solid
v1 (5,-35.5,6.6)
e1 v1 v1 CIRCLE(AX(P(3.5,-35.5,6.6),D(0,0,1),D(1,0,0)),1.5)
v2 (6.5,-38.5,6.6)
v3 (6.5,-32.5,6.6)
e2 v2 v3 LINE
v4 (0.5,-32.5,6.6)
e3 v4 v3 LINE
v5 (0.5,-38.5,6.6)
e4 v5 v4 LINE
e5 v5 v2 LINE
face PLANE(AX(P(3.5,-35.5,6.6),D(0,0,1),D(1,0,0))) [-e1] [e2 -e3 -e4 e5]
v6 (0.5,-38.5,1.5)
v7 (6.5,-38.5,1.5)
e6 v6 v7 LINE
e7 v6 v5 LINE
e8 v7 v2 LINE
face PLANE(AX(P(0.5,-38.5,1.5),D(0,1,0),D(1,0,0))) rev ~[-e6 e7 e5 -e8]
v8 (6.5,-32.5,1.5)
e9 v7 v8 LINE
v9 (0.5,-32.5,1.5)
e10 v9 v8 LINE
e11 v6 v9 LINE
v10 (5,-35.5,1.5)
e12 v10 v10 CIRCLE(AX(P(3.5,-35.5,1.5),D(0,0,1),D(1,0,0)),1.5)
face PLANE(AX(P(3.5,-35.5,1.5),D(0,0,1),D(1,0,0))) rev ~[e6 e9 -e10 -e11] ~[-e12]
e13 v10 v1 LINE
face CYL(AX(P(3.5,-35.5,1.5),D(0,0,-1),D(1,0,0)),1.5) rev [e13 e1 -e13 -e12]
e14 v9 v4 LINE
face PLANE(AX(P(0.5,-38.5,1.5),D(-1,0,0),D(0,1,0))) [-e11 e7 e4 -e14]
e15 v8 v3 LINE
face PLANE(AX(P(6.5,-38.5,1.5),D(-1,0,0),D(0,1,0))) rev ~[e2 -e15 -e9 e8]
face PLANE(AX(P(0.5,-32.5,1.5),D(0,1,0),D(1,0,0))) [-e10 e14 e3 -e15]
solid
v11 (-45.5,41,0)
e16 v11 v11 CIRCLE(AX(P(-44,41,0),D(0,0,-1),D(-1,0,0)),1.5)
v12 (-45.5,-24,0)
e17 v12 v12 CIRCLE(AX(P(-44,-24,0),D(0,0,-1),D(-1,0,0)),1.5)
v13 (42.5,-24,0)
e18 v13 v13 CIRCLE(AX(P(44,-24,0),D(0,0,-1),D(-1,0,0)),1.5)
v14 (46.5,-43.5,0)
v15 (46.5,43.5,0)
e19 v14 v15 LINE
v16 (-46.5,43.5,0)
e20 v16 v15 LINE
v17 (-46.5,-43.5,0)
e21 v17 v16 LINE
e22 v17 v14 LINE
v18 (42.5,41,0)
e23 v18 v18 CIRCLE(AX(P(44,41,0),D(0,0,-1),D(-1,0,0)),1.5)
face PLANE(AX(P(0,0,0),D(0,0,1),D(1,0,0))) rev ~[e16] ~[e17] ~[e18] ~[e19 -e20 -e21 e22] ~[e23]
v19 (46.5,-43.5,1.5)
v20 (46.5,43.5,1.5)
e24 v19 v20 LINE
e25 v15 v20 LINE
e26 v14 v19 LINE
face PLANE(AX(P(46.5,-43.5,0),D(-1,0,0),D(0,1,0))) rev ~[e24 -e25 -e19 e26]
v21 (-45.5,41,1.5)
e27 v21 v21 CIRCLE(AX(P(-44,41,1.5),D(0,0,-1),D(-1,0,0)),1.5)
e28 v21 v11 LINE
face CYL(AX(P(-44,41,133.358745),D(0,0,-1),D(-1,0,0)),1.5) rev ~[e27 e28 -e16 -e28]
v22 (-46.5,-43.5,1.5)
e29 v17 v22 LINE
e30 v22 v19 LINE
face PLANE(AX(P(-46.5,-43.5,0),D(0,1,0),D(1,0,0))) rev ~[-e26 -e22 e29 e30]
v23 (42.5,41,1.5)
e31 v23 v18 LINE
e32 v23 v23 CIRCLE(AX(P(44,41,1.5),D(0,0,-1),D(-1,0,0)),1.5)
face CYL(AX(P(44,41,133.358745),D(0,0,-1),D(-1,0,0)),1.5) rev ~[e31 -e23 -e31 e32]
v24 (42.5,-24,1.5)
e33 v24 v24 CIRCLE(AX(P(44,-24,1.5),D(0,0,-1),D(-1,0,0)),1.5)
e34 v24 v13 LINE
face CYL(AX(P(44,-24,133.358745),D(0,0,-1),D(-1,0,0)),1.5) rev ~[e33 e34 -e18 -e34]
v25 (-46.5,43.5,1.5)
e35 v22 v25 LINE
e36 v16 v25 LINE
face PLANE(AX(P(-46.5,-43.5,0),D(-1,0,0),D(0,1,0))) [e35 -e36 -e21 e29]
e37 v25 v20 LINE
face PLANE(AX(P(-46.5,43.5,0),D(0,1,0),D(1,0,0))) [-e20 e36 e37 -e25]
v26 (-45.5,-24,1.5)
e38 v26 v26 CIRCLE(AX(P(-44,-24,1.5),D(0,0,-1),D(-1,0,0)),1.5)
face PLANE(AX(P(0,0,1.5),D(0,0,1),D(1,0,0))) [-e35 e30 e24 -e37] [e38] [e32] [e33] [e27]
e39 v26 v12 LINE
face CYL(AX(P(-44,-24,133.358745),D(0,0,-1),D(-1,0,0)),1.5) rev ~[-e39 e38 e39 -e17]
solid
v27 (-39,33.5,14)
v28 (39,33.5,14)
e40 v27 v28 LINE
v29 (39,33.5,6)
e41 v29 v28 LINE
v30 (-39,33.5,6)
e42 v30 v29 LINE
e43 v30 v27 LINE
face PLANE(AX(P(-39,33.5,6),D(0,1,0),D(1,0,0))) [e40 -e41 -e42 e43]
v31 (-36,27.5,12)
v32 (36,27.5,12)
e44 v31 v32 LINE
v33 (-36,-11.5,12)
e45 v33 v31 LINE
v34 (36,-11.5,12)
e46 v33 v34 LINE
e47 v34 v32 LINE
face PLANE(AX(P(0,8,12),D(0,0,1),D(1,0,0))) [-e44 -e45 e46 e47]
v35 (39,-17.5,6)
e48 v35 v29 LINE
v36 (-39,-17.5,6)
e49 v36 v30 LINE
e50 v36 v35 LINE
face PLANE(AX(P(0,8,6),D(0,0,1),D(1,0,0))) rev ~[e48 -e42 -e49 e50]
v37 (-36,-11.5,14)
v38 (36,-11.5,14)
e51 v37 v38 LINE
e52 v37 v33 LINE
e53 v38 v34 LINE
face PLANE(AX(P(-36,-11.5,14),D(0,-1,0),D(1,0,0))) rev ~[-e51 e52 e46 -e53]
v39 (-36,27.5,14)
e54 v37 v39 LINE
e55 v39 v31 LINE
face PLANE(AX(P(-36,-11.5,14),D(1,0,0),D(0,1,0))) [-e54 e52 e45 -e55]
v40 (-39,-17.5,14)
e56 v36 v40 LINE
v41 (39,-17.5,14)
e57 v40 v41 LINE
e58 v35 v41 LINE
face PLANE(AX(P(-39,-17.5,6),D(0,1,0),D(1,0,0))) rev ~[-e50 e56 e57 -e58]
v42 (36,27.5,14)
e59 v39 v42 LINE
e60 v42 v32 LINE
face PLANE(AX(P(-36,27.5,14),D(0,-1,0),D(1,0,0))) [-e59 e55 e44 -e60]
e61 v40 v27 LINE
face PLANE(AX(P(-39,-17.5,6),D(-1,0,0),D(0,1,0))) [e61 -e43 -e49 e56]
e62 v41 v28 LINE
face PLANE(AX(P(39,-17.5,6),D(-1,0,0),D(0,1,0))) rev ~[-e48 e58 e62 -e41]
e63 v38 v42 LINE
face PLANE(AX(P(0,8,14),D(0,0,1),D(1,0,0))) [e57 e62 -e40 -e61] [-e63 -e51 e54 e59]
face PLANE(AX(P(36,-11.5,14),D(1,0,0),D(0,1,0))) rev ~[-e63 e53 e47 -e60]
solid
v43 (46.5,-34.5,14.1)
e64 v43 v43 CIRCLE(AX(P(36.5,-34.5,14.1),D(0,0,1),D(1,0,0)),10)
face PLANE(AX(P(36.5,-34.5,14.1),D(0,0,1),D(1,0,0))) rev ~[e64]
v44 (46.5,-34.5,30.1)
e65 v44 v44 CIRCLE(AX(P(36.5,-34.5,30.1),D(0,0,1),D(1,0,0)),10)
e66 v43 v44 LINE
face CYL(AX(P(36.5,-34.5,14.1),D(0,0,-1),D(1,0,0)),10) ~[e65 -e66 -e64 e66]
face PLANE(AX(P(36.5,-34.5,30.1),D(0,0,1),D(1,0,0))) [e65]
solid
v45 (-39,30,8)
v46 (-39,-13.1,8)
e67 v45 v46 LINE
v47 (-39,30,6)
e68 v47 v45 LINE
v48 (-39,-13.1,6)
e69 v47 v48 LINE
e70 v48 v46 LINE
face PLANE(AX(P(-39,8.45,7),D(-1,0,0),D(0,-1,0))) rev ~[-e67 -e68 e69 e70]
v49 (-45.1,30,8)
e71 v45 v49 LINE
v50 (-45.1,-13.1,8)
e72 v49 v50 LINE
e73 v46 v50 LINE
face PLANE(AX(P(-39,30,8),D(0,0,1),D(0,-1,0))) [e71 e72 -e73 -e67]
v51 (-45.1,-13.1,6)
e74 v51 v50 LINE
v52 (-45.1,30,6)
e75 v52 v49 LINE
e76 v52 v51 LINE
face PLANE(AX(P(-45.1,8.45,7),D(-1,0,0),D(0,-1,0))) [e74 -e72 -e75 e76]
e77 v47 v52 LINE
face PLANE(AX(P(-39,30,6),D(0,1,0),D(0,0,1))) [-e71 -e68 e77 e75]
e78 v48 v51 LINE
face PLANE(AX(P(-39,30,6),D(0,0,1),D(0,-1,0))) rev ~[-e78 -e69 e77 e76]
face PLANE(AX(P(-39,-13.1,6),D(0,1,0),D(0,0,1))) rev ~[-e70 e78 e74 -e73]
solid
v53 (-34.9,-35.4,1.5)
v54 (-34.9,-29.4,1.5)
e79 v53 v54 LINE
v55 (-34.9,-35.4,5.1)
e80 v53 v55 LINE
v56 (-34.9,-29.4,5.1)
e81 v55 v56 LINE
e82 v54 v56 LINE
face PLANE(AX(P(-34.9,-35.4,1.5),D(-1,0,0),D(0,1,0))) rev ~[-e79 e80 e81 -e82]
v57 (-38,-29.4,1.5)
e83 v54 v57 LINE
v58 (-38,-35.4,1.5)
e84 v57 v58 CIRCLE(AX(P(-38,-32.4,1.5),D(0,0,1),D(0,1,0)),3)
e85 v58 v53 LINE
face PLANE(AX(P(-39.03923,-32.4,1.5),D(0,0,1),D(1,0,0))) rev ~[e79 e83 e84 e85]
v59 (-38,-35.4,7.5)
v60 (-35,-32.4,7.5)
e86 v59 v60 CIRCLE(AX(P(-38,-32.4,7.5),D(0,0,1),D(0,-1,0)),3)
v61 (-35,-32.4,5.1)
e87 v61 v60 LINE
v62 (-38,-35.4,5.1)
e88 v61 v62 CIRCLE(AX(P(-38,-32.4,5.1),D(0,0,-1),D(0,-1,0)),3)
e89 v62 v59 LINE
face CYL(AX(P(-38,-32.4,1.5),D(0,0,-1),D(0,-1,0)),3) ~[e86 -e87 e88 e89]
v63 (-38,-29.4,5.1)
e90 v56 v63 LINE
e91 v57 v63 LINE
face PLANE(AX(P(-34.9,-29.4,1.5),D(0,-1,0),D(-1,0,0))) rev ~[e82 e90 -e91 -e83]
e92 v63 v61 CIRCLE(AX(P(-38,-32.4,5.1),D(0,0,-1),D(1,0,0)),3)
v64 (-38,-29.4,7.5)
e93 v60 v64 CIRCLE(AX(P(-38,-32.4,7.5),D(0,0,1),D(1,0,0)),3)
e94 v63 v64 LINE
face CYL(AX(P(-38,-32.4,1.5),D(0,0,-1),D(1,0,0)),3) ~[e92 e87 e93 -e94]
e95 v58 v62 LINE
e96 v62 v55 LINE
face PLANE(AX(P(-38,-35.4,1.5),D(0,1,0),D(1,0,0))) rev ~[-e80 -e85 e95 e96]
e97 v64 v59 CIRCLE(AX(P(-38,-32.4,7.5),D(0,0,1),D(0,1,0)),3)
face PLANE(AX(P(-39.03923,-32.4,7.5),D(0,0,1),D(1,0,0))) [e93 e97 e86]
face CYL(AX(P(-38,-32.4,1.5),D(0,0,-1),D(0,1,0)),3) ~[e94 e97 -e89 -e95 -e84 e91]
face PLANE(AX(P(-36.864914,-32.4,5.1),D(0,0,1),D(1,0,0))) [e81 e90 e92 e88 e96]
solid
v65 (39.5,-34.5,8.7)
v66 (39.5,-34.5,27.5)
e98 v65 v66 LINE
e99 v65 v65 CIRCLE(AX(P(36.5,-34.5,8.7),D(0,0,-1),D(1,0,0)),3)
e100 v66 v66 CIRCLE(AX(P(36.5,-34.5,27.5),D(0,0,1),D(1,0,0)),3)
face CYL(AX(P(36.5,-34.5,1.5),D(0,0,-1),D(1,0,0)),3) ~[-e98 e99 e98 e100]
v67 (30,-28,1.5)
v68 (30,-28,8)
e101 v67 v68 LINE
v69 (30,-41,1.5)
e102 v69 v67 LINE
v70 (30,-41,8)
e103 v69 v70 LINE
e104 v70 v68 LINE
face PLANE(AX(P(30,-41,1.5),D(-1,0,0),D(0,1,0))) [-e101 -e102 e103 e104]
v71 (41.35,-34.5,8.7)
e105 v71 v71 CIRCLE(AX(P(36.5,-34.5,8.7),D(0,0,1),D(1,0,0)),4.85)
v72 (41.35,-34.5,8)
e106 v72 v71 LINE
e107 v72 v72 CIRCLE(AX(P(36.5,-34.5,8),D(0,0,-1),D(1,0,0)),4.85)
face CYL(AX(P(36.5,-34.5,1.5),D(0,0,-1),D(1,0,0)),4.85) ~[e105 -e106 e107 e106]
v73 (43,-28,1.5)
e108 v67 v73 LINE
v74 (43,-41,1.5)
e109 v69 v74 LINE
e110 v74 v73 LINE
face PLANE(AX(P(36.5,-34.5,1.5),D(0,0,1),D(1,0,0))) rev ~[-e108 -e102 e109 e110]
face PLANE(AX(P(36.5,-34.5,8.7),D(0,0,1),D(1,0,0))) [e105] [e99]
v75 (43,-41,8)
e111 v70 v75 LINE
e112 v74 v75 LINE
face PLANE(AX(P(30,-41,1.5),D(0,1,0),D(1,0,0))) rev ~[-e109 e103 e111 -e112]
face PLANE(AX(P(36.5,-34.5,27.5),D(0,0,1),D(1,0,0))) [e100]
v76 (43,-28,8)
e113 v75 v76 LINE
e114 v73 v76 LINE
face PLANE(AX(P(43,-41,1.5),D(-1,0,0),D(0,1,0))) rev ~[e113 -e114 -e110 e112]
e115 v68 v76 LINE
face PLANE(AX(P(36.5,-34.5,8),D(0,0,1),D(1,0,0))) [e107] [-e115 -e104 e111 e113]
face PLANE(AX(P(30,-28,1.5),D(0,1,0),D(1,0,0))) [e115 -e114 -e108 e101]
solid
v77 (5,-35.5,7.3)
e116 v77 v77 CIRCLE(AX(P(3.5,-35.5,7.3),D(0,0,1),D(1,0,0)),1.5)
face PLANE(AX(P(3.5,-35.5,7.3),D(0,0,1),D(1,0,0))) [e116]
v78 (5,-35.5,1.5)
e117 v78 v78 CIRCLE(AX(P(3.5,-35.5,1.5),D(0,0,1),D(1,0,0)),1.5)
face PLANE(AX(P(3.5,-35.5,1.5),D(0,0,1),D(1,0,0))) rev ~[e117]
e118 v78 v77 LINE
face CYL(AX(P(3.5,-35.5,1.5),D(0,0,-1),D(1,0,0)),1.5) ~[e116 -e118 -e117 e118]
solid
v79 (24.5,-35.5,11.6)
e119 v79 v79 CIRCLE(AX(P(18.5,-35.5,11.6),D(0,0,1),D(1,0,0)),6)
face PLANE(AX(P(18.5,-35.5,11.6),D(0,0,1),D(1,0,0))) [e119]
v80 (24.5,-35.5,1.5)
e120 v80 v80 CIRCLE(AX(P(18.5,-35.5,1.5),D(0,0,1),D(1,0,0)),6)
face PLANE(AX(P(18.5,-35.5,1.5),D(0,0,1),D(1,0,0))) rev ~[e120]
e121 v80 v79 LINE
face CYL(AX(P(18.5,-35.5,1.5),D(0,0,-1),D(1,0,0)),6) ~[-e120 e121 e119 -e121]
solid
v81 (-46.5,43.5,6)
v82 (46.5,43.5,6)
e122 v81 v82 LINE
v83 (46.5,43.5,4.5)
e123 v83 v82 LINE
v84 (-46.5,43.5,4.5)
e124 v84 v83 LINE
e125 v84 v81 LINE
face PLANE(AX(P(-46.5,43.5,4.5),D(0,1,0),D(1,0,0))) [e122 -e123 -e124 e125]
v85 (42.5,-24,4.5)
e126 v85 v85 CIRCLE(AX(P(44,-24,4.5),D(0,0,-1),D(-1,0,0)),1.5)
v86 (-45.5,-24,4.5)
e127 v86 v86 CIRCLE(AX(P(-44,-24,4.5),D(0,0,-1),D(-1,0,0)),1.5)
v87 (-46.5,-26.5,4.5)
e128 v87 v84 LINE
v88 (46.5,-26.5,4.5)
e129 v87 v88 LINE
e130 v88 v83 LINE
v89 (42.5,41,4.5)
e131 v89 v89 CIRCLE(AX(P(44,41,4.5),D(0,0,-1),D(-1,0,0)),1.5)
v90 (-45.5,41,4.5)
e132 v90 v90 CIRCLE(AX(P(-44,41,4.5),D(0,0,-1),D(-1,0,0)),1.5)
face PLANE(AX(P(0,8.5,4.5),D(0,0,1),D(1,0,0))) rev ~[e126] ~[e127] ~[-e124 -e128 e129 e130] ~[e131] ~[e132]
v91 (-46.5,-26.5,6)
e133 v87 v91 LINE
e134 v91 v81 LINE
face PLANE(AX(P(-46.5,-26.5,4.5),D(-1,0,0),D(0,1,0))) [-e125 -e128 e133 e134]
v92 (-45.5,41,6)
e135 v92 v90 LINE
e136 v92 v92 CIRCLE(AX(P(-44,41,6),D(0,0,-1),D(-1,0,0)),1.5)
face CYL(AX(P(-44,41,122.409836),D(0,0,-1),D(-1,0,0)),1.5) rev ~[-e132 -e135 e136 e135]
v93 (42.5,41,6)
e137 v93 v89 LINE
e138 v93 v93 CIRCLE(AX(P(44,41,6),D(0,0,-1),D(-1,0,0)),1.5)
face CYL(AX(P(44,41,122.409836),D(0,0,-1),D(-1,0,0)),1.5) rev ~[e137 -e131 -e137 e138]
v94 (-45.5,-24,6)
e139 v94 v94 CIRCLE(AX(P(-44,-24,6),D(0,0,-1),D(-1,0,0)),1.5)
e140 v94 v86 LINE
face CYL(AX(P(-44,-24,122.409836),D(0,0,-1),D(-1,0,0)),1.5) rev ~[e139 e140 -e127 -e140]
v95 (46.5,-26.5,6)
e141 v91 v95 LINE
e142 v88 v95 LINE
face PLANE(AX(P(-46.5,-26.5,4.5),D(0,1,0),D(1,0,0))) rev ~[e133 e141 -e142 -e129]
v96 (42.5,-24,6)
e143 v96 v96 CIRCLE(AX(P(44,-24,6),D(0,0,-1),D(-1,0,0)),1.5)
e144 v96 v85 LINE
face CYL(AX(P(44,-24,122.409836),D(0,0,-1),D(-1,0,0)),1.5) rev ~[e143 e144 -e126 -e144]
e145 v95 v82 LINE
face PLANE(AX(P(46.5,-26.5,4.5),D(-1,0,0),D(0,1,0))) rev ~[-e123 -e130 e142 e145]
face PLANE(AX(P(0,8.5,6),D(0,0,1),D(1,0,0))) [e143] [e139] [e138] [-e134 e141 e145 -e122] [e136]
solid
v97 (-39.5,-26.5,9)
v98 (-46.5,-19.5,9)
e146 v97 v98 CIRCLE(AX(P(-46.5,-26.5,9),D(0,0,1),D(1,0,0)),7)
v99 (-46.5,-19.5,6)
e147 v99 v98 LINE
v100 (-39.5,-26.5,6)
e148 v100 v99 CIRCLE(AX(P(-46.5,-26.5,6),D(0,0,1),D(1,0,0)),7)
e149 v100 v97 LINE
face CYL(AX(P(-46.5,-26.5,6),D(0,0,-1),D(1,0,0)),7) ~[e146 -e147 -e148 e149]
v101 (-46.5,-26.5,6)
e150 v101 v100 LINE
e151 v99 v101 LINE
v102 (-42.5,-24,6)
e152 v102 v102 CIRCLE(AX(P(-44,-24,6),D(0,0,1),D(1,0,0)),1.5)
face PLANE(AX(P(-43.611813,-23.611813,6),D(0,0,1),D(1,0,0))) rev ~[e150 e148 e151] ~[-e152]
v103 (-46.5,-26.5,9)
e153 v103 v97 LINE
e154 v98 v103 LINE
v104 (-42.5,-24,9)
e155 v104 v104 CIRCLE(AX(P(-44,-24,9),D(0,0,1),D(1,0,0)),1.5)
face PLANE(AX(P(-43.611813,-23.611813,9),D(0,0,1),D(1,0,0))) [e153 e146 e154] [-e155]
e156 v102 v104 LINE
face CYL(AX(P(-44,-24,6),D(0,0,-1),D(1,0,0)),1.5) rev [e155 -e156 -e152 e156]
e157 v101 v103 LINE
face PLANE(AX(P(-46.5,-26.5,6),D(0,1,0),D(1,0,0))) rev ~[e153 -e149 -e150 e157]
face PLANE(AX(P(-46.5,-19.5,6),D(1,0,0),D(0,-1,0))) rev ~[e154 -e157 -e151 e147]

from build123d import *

# Parameters (mm, degrees)
F0_W      = 93
F0_H      = 87
F1_DEPTH  = 1.5
F3_W      = 93
F3_H      = 70
F4_DEPTH  = 1.5
F5_W      = 78
F5_H      = 51
F6_DEPTH  = 8
F7_W      = 72
F7_H      = 39
F8_DEPTH  = 2
F9_W      = 43.1
F9_H      = 2
F10_DEPTH = 6.1
F12_D     = 3
F12_2_D   = 3
F14_DEPTH = 3.6
F15_DEPTH = 6
F13_R     = 1.5
F16_DEPTH = 5.8
F13_W     = 6
F13_H     = 6
F17_DEPTH = 5.1
F13_R_2   = 6
F18_DEPTH = 10.1
F13_W_2   = 13
F13_H_2   = 13
F13_R_3   = 4.85
F13_R_4   = 3
F19_DEPTH = 6.5
F20_DEPTH = 7.2
F21_DEPTH = 26
F23_R     = 10
F24_DEPTH = 16
F25_R     = 1.5
F26_DEPTH = 3


with BuildPart() as f1:
    # F0 (on Top) → F1 (new body)
    with BuildSketch(Plane.XY):
        Rectangle(F0_W, F0_H)
    extrude(amount=F1_DEPTH)

    # F12 (through all)
    with Locations(Plane.XY.offset(6)):
        with Locations((-44, 41), (44, 41), (44, -24), (-44, -24)):
            Hole(F12_D / 2)


with BuildPart() as f4:
    # F3 (on offset) → F4 (new body)
    with BuildSketch(Plane.XY.offset(4.5)):
        with Locations((0, 8.5)):
            Rectangle(F3_W, F3_H)
    extrude(amount=F4_DEPTH)

    # F12#2 (through all)
    with Locations(Plane.XY.offset(6)):
        with Locations((-44, 41), (44, 41), (44, -24), (-44, -24)):
            Hole(F12_2_D / 2)


with BuildPart() as f6:
    # F5 (on face) → F6 (new body)
    with BuildSketch(Plane.XY.offset(6)):
        with Locations((0, 8)):
            Rectangle(F5_W, F5_H)
    extrude(amount=F6_DEPTH)

    # F7 (on face) → F8 (cut)
    with BuildSketch(Plane.XY.offset(14)):
        with Locations((0, 8)):
            Rectangle(F7_W, F7_H)
    extrude(amount=-F8_DEPTH, mode=Mode.SUBTRACT)


with BuildPart() as f10:
    # F9 (on face) → F10 (new body)
    with BuildSketch(Plane(origin=(-39, 0, 0), x_dir=(0, -1, 0), z_dir=(-1, 0, 0))):
        with Locations((-8.45, 7)):
            Rectangle(F9_W, F9_H)
    extrude(amount=F10_DEPTH)


with BuildPart() as f14:
    # F13 (on face) → F14 (new body)
    with BuildSketch(Plane.XY.offset(1.5)):
        with BuildLine():
            ThreePointArc((-38, -35.4), (-35.8786796564, -34.5213203436), (-35, -32.4))
            ThreePointArc((-35, -32.4), (-35.8786796564, -30.2786796564), (-38, -29.4))
            Line((-38, -29.4), (-38, -35.4))
        make_face()
        with BuildLine():
            ThreePointArc((-38, -29.4), (-35.8786796564, -30.2786796564), (-35, -32.4))
            ThreePointArc((-35, -32.4), (-35.8786796564, -34.5213203436), (-38, -35.4))
            Line((-38, -35.4), (-34.9, -35.4))
            Line((-34.9, -35.4), (-34.9, -29.4))
            Line((-34.9, -29.4), (-38, -29.4))
        make_face()
    extrude(amount=F14_DEPTH)

    # F13 (on face) → F15 (join)
    with BuildSketch(Plane.XY.offset(1.5)):
        with BuildLine():
            Line((-38, -35.4), (-38, -29.4))
            ThreePointArc((-38, -29.4), (-41, -32.4), (-38, -35.4))
        make_face()
        with BuildLine():
            ThreePointArc((-38, -35.4), (-35.8786796564, -34.5213203436), (-35, -32.4))
            ThreePointArc((-35, -32.4), (-35.8786796564, -30.2786796564), (-38, -29.4))
            Line((-38, -29.4), (-38, -35.4))
        make_face()
    extrude(amount=F15_DEPTH)


with BuildPart() as f16:
    # F13 (on face) → F16 (new body)
    with BuildSketch(Plane.XY.offset(1.5)):
        with Locations((3.5, -35.5)):
            Circle(F13_R)
    extrude(amount=F16_DEPTH)


with BuildPart() as f17:
    # F13 (on face) → F17 (new body)
    with BuildSketch(Plane.XY.offset(1.5)):
        with Locations((3.5, -35.5)):
            Rectangle(F13_W, F13_H)
        with Locations((3.5, -35.5)):
            Circle(F13_R, mode=Mode.SUBTRACT)
    extrude(amount=F17_DEPTH)


with BuildPart() as f18:
    # F13 (on face) → F18 (new body)
    with BuildSketch(Plane.XY.offset(1.5)):
        with Locations((18.5, -35.5)):
            Circle(F13_R_2)
    extrude(amount=F18_DEPTH)


with BuildPart() as f19:
    # F13 (on face) → F19 (new body)
    with BuildSketch(Plane.XY.offset(1.5)):
        with Locations((36.5, -34.5)):
            Rectangle(F13_W_2, F13_H_2)
        with Locations((36.5, -34.5)):
            Circle(F13_R_3, mode=Mode.SUBTRACT)
        with Locations((36.5, -34.5)):
            Circle(F13_R_3)
        with Locations((36.5, -34.5)):
            Circle(F13_R_4, mode=Mode.SUBTRACT)
        with Locations((36.5, -34.5)):
            Circle(F13_R_4)
    extrude(amount=F19_DEPTH)

    # F13 (on face) → F20 (join)
    with BuildSketch(Plane.XY.offset(1.5)):
        with Locations((36.5, -34.5)):
            Circle(F13_R_3)
        with Locations((36.5, -34.5)):
            Circle(F13_R_4, mode=Mode.SUBTRACT)
        with Locations((36.5, -34.5)):
            Circle(F13_R_4)
    extrude(amount=F20_DEPTH)

    # F13 (on face) → F21 (join)
    with BuildSketch(Plane.XY.offset(1.5)):
        with Locations((36.5, -34.5)):
            Circle(F13_R_4)
    extrude(amount=F21_DEPTH)


with BuildPart() as f24:
    # F23 (on offset) → F24 (new body)
    with BuildSketch(Plane.XY.offset(14.1)):
        with Locations((36.5, -34.5)):
            Circle(F23_R)
    extrude(amount=F24_DEPTH)


with BuildPart() as f26:
    # F25 (on face) → F26 (new body)
    with BuildSketch(Plane.XY.offset(6)):
        with BuildLine():
            Line((-46.5, -19.5), (-46.5, -26.5))
            Line((-46.5, -26.5), (-39.5, -26.5))
            ThreePointArc((-39.5, -26.5), (-41.5502525317, -21.5502525317), (-46.5, -19.5))
        make_face()
        with Locations((-44, -24)):
            Circle(F25_R, mode=Mode.SUBTRACT)
    extrude(amount=F26_DEPTH)


solid = Compound([f1.part, f4.part, f6.part, f10.part, f14.part, f16.part, f17.part, f18.part, f19.part, f24.part, f26.part])
